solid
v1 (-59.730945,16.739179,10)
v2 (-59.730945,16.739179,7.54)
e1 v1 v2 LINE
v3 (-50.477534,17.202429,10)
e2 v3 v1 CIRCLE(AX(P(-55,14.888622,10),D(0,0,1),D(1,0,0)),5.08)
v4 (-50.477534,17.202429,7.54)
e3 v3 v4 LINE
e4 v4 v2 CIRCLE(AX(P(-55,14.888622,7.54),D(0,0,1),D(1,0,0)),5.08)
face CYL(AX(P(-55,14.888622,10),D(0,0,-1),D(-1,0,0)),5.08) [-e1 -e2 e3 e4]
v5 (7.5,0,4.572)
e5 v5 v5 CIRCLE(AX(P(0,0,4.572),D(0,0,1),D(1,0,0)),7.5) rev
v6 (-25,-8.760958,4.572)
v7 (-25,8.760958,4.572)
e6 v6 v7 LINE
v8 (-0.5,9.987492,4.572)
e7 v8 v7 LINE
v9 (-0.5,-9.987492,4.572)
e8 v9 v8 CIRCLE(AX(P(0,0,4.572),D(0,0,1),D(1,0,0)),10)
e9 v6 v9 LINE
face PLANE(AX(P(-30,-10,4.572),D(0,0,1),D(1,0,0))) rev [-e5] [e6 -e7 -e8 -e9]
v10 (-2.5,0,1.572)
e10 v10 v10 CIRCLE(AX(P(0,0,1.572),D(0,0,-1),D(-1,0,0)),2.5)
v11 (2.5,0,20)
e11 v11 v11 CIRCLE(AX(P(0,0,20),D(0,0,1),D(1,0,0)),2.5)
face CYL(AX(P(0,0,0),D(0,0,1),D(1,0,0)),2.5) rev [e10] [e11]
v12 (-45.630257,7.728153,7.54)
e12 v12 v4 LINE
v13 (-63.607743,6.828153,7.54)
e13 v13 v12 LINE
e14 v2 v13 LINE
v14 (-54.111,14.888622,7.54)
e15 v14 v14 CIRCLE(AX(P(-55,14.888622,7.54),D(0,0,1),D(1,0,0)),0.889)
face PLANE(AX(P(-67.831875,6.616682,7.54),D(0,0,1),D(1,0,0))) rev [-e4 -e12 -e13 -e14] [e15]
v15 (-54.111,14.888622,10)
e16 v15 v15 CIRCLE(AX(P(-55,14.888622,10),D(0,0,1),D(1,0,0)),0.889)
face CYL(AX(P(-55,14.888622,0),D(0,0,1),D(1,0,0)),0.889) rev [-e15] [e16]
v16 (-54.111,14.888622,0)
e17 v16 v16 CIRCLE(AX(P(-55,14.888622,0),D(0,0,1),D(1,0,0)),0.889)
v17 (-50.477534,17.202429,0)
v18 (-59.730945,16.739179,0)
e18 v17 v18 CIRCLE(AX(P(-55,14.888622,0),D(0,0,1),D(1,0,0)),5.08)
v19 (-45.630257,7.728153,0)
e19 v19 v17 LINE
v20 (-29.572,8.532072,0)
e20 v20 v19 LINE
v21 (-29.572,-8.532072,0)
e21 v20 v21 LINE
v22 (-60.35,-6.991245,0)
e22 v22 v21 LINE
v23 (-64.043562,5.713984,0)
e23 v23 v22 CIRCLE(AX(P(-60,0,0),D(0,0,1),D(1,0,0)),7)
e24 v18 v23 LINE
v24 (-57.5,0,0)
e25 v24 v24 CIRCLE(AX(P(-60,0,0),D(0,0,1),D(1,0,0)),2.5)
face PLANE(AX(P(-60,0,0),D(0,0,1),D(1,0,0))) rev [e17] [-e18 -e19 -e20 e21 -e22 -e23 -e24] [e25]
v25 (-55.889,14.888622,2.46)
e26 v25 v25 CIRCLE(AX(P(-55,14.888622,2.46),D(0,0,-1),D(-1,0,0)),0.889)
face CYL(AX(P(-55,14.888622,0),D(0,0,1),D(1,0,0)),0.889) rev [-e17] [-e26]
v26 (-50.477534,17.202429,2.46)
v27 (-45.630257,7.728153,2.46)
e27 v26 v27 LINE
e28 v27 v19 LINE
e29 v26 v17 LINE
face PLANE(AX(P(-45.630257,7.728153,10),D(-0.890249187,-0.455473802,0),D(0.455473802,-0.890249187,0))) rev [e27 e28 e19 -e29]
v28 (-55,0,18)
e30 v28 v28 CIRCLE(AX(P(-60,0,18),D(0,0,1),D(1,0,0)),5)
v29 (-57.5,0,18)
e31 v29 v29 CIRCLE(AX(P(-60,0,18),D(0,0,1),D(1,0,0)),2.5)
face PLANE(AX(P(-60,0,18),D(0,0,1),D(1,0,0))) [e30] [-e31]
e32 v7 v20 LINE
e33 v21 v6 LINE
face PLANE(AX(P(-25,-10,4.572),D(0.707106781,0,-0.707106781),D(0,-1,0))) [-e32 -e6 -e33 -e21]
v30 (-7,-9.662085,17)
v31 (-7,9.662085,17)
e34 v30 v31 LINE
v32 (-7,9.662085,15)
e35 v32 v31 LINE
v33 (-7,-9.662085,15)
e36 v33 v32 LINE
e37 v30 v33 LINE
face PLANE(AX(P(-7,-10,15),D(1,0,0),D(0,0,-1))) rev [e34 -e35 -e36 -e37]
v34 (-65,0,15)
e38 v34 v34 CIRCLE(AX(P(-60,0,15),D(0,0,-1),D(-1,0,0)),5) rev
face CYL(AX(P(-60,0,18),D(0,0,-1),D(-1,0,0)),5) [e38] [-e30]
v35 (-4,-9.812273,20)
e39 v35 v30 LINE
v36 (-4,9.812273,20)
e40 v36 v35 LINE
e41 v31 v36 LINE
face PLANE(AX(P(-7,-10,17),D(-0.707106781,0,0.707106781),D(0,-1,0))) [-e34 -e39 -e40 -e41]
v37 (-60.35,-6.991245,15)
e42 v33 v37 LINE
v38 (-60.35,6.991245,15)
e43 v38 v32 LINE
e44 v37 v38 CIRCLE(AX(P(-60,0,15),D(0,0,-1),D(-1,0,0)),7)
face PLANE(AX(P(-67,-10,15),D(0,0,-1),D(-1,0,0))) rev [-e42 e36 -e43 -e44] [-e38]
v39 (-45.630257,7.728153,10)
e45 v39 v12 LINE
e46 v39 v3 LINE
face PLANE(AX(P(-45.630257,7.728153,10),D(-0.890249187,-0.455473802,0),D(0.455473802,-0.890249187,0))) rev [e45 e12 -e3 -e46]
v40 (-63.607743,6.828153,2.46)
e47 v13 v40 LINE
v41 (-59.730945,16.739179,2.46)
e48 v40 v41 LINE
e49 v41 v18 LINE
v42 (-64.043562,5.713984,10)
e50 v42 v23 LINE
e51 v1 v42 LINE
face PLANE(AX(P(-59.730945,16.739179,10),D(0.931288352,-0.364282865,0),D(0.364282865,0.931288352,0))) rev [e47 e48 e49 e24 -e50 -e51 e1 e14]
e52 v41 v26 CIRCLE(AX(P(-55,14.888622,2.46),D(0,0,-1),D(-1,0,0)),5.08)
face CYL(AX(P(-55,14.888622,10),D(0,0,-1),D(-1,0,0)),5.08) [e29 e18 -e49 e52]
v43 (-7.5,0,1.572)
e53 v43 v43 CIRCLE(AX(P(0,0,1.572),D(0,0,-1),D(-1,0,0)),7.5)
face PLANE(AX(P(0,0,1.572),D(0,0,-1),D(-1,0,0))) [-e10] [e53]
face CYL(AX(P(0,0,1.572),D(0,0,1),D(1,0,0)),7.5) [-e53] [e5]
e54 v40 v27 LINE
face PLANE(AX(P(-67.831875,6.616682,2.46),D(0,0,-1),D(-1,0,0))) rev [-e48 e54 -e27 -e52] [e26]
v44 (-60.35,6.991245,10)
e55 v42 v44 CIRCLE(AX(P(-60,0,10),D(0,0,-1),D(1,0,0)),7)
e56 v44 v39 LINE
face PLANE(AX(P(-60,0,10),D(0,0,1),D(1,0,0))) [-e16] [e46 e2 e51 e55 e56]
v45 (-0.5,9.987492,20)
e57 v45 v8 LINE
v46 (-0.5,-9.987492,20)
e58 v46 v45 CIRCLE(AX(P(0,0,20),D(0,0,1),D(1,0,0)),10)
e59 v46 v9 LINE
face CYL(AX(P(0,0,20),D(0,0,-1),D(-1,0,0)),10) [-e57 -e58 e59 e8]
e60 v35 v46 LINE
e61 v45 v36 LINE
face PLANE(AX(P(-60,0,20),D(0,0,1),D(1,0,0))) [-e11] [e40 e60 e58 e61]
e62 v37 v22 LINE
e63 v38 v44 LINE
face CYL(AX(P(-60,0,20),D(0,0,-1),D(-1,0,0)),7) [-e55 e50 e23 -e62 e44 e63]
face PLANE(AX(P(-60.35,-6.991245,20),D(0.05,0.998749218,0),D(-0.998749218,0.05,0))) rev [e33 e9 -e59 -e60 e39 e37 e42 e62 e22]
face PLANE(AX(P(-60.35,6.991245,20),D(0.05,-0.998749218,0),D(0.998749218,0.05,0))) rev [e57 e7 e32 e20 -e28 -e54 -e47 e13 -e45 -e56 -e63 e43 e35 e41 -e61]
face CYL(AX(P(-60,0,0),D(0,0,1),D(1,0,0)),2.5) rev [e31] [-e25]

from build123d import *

# Parameters (mm, degrees)
BOSS_EXTRUDE1_DEPTH     = 20
SKETCH2_R               = 2.5
CUT_EXTRUDE1_DEPTH      = 71.632853546
BOSS_EXTRUDE4_DEPTH     = 10
CUT_EXTRUDE2_DEPTH      = 80.703956491
CUT_EXTRUDE2_DEPTH_BACK = 80.703956491
SKETCH6_W               = 5.08
SKETCH6_H               = 17.7
SKETCH7_R               = 0.889
CUT_EXTRUDE3_DEPTH      = 73.716888558
CUT_EXTRUDE4_DEPTH      = 73.716888558
CUT_EXTRUDE4_DEPTH_BACK = 73.716888558
SKETCH8_W               = 40
SKETCH8_H               = 4.572
SKETCH8_W_2             = 60
SKETCH8_H_2             = 5
SKETCH4_R               = 7.5
SKETCH4_R_2             = 2.5
BOSS_EXTRUDE3_DEPTH     = 3
CHAMFER1_SIZE           = 5
BOSS_EXTRUDE2_START     = 3
SKETCH3_R               = 5
SKETCH3_R_2             = 2.5
BOSS_EXTRUDE2_DEPTH     = 3
CHAMFER2_SIZE           = 3


with BuildPart() as part:
    # Sketch1 → Boss-Extrude1 (new body)
    with BuildSketch(Plane.XY):
        with BuildLine():
            Line((-60.35, 6.991244524), (-0.5, 9.987492178))
            ThreePointArc((-0.5, 9.987492178), (10, 0), (-0.5, -9.987492178))
            Line((-0.5, -9.987492178), (-60.35, -6.991244524))
            ThreePointArc((-60.35, -6.991244524), (-67, 0), (-60.35, 6.991244524))
        make_face()
    extrude(amount=BOSS_EXTRUDE1_DEPTH)

    # Sketch2 → Cut-Extrude1 (cut, through all)
    with BuildSketch(Plane.XY.offset(20)):
        with Locations((-60, 0)):
            Circle(SKETCH2_R)
        Circle(SKETCH2_R)
    extrude(amount=-CUT_EXTRUDE1_DEPTH, mode=Mode.SUBTRACT)

    # Sketch5 → Boss-Extrude4 (add)
    with BuildSketch(Plane.XY):
        with BuildLine():
            Line((-60.35, 6.991244524), (-45.63025704, 7.728153385))
            Line((-45.63025704, 7.728153385), (-50.477534128, 17.202429338))
            ThreePointArc((-50.477534128, 17.202429338), (-55.254, 19.962268451), (-59.730944827, 16.739179378))
            Line((-59.730944827, 16.739179378), (-63.60774296, 6.828153385))
            Line((-63.60774296, 6.828153385), (-64.043561758, 5.713983576))
            ThreePointArc((-64.043561758, 5.713983576), (-62.287727062, 6.615610697), (-60.35, 6.991244524))
        make_face()
    extrude(amount=BOSS_EXTRUDE4_DEPTH)

    # Sketch6 → Cut-Extrude2 (cut, two sides: drawn at the far end of the back side and taken through both)
    with BuildSketch(Plane(origin=(-63.598111022, -3.183887901, 0), x_dir=(0, 0, -1), z_dir=(0.9987492177719091, 0.05000000000000006, -2.8501484999108014e-15)).offset(-CUT_EXTRUDE2_DEPTH_BACK)):
        with Locations((-5, 18.85)):
            Rectangle(SKETCH6_W, SKETCH6_H)
    extrude(amount=CUT_EXTRUDE2_DEPTH + CUT_EXTRUDE2_DEPTH_BACK, mode=Mode.SUBTRACT)

    # Sketch7 → Cut-Extrude3 (cut, through all)
    with BuildSketch(Plane.XY.offset(20)):
        with Locations((-55, 14.888622424)):
            Circle(SKETCH7_R)
    extrude(amount=-CUT_EXTRUDE3_DEPTH, mode=Mode.SUBTRACT)

    # Sketch8 → Cut-Extrude4 (cut, two sides: drawn at the far end of the back side and taken through both)
    with BuildSketch(Plane(origin=(0, 0, 0), x_dir=(1, 0, 0), z_dir=(0, 1, 0)).offset(-CUT_EXTRUDE4_DEPTH_BACK)):
        with Locations((-10, -2.286)):
            Rectangle(SKETCH8_W, SKETCH8_H)
        with Locations((-37, -17.5)):
            Rectangle(SKETCH8_W_2, SKETCH8_H_2)
    extrude(amount=CUT_EXTRUDE4_DEPTH + CUT_EXTRUDE4_DEPTH_BACK, mode=Mode.SUBTRACT)

    # Sketch4 → Boss-Extrude3 (add)
    with BuildSketch(Plane(origin=(0, 0, 4.572), x_dir=(-1, 0, 0), z_dir=(0, 0, -1))):
        with Locations(Location((0, 0, 0), (0, 0, 180))):
            Circle(SKETCH4_R)
        with Locations(Location((0, 0, 0), (0, 0, 180))):
            Circle(SKETCH4_R_2, mode=Mode.SUBTRACT)
    extrude(amount=BOSS_EXTRUDE3_DEPTH)

    # Chamfer1
    # the kernel refuses this chamfer: 5 mm, written as the material it adds along each edge
    with BuildSketch(Plane(origin=(-30, -21.369059903, 4.572), x_dir=(-0.027495876610586317, 0, -0.9996219169112968), z_dir=(0, 1, 0))) as chamfer1_piece_1_section:
        Polygon((CHAMFER1_SIZE * 0.999621916911, -CHAMFER1_SIZE * 0.0274958766106), (-CHAMFER1_SIZE * 0.0274958766106, -CHAMFER1_SIZE * 0.999621916911), (0, 0), align=None)
    chamfer1_piece_1 = extrude(amount=42.738119807, mode=Mode.PRIVATE)
    chamfer1_piece_1 = split(chamfer1_piece_1, bisect_by=Plane(origin=(-28.745975843, 8.573424695, 2.975382292), z_dir=(0.050000000000000065, -0.998749217771909, 0)), keep=Keep.TOP, mode=Mode.PRIVATE)
    chamfer1_piece_1 = split(chamfer1_piece_1, bisect_by=Plane(origin=(-28.316767762, 0, 0), z_dir=(0, 0, 1)), keep=Keep.TOP, mode=Mode.PRIVATE)
    chamfer1_piece_1 = split(chamfer1_piece_1, bisect_by=Plane(origin=(-28.745975843, -8.573424695, 2.975382292), z_dir=(0.05000000000000006, 0.998749217771909, 0)), keep=Keep.TOP, mode=Mode.PRIVATE)
    add(chamfer1_piece_1)

    # Sketch3 → Boss-Extrude2 (add)
    with BuildSketch(Plane.XY.offset(15).offset(BOSS_EXTRUDE2_START)):
        with Locations(Location((-60, 0, 0), (0, 0, 180))):
            Circle(SKETCH3_R)
        with Locations((-60, 0)):
            Circle(SKETCH3_R_2, mode=Mode.SUBTRACT)
    extrude(amount=-BOSS_EXTRUDE2_DEPTH)

    # Chamfer2
    chamfer2_edges = [part.edges().sort_by_distance(p)[0] for p in [
        (-7, 0, 20),
    ]]
    chamfer(chamfer2_edges, length=CHAMFER2_SIZE)


solid = part.part
